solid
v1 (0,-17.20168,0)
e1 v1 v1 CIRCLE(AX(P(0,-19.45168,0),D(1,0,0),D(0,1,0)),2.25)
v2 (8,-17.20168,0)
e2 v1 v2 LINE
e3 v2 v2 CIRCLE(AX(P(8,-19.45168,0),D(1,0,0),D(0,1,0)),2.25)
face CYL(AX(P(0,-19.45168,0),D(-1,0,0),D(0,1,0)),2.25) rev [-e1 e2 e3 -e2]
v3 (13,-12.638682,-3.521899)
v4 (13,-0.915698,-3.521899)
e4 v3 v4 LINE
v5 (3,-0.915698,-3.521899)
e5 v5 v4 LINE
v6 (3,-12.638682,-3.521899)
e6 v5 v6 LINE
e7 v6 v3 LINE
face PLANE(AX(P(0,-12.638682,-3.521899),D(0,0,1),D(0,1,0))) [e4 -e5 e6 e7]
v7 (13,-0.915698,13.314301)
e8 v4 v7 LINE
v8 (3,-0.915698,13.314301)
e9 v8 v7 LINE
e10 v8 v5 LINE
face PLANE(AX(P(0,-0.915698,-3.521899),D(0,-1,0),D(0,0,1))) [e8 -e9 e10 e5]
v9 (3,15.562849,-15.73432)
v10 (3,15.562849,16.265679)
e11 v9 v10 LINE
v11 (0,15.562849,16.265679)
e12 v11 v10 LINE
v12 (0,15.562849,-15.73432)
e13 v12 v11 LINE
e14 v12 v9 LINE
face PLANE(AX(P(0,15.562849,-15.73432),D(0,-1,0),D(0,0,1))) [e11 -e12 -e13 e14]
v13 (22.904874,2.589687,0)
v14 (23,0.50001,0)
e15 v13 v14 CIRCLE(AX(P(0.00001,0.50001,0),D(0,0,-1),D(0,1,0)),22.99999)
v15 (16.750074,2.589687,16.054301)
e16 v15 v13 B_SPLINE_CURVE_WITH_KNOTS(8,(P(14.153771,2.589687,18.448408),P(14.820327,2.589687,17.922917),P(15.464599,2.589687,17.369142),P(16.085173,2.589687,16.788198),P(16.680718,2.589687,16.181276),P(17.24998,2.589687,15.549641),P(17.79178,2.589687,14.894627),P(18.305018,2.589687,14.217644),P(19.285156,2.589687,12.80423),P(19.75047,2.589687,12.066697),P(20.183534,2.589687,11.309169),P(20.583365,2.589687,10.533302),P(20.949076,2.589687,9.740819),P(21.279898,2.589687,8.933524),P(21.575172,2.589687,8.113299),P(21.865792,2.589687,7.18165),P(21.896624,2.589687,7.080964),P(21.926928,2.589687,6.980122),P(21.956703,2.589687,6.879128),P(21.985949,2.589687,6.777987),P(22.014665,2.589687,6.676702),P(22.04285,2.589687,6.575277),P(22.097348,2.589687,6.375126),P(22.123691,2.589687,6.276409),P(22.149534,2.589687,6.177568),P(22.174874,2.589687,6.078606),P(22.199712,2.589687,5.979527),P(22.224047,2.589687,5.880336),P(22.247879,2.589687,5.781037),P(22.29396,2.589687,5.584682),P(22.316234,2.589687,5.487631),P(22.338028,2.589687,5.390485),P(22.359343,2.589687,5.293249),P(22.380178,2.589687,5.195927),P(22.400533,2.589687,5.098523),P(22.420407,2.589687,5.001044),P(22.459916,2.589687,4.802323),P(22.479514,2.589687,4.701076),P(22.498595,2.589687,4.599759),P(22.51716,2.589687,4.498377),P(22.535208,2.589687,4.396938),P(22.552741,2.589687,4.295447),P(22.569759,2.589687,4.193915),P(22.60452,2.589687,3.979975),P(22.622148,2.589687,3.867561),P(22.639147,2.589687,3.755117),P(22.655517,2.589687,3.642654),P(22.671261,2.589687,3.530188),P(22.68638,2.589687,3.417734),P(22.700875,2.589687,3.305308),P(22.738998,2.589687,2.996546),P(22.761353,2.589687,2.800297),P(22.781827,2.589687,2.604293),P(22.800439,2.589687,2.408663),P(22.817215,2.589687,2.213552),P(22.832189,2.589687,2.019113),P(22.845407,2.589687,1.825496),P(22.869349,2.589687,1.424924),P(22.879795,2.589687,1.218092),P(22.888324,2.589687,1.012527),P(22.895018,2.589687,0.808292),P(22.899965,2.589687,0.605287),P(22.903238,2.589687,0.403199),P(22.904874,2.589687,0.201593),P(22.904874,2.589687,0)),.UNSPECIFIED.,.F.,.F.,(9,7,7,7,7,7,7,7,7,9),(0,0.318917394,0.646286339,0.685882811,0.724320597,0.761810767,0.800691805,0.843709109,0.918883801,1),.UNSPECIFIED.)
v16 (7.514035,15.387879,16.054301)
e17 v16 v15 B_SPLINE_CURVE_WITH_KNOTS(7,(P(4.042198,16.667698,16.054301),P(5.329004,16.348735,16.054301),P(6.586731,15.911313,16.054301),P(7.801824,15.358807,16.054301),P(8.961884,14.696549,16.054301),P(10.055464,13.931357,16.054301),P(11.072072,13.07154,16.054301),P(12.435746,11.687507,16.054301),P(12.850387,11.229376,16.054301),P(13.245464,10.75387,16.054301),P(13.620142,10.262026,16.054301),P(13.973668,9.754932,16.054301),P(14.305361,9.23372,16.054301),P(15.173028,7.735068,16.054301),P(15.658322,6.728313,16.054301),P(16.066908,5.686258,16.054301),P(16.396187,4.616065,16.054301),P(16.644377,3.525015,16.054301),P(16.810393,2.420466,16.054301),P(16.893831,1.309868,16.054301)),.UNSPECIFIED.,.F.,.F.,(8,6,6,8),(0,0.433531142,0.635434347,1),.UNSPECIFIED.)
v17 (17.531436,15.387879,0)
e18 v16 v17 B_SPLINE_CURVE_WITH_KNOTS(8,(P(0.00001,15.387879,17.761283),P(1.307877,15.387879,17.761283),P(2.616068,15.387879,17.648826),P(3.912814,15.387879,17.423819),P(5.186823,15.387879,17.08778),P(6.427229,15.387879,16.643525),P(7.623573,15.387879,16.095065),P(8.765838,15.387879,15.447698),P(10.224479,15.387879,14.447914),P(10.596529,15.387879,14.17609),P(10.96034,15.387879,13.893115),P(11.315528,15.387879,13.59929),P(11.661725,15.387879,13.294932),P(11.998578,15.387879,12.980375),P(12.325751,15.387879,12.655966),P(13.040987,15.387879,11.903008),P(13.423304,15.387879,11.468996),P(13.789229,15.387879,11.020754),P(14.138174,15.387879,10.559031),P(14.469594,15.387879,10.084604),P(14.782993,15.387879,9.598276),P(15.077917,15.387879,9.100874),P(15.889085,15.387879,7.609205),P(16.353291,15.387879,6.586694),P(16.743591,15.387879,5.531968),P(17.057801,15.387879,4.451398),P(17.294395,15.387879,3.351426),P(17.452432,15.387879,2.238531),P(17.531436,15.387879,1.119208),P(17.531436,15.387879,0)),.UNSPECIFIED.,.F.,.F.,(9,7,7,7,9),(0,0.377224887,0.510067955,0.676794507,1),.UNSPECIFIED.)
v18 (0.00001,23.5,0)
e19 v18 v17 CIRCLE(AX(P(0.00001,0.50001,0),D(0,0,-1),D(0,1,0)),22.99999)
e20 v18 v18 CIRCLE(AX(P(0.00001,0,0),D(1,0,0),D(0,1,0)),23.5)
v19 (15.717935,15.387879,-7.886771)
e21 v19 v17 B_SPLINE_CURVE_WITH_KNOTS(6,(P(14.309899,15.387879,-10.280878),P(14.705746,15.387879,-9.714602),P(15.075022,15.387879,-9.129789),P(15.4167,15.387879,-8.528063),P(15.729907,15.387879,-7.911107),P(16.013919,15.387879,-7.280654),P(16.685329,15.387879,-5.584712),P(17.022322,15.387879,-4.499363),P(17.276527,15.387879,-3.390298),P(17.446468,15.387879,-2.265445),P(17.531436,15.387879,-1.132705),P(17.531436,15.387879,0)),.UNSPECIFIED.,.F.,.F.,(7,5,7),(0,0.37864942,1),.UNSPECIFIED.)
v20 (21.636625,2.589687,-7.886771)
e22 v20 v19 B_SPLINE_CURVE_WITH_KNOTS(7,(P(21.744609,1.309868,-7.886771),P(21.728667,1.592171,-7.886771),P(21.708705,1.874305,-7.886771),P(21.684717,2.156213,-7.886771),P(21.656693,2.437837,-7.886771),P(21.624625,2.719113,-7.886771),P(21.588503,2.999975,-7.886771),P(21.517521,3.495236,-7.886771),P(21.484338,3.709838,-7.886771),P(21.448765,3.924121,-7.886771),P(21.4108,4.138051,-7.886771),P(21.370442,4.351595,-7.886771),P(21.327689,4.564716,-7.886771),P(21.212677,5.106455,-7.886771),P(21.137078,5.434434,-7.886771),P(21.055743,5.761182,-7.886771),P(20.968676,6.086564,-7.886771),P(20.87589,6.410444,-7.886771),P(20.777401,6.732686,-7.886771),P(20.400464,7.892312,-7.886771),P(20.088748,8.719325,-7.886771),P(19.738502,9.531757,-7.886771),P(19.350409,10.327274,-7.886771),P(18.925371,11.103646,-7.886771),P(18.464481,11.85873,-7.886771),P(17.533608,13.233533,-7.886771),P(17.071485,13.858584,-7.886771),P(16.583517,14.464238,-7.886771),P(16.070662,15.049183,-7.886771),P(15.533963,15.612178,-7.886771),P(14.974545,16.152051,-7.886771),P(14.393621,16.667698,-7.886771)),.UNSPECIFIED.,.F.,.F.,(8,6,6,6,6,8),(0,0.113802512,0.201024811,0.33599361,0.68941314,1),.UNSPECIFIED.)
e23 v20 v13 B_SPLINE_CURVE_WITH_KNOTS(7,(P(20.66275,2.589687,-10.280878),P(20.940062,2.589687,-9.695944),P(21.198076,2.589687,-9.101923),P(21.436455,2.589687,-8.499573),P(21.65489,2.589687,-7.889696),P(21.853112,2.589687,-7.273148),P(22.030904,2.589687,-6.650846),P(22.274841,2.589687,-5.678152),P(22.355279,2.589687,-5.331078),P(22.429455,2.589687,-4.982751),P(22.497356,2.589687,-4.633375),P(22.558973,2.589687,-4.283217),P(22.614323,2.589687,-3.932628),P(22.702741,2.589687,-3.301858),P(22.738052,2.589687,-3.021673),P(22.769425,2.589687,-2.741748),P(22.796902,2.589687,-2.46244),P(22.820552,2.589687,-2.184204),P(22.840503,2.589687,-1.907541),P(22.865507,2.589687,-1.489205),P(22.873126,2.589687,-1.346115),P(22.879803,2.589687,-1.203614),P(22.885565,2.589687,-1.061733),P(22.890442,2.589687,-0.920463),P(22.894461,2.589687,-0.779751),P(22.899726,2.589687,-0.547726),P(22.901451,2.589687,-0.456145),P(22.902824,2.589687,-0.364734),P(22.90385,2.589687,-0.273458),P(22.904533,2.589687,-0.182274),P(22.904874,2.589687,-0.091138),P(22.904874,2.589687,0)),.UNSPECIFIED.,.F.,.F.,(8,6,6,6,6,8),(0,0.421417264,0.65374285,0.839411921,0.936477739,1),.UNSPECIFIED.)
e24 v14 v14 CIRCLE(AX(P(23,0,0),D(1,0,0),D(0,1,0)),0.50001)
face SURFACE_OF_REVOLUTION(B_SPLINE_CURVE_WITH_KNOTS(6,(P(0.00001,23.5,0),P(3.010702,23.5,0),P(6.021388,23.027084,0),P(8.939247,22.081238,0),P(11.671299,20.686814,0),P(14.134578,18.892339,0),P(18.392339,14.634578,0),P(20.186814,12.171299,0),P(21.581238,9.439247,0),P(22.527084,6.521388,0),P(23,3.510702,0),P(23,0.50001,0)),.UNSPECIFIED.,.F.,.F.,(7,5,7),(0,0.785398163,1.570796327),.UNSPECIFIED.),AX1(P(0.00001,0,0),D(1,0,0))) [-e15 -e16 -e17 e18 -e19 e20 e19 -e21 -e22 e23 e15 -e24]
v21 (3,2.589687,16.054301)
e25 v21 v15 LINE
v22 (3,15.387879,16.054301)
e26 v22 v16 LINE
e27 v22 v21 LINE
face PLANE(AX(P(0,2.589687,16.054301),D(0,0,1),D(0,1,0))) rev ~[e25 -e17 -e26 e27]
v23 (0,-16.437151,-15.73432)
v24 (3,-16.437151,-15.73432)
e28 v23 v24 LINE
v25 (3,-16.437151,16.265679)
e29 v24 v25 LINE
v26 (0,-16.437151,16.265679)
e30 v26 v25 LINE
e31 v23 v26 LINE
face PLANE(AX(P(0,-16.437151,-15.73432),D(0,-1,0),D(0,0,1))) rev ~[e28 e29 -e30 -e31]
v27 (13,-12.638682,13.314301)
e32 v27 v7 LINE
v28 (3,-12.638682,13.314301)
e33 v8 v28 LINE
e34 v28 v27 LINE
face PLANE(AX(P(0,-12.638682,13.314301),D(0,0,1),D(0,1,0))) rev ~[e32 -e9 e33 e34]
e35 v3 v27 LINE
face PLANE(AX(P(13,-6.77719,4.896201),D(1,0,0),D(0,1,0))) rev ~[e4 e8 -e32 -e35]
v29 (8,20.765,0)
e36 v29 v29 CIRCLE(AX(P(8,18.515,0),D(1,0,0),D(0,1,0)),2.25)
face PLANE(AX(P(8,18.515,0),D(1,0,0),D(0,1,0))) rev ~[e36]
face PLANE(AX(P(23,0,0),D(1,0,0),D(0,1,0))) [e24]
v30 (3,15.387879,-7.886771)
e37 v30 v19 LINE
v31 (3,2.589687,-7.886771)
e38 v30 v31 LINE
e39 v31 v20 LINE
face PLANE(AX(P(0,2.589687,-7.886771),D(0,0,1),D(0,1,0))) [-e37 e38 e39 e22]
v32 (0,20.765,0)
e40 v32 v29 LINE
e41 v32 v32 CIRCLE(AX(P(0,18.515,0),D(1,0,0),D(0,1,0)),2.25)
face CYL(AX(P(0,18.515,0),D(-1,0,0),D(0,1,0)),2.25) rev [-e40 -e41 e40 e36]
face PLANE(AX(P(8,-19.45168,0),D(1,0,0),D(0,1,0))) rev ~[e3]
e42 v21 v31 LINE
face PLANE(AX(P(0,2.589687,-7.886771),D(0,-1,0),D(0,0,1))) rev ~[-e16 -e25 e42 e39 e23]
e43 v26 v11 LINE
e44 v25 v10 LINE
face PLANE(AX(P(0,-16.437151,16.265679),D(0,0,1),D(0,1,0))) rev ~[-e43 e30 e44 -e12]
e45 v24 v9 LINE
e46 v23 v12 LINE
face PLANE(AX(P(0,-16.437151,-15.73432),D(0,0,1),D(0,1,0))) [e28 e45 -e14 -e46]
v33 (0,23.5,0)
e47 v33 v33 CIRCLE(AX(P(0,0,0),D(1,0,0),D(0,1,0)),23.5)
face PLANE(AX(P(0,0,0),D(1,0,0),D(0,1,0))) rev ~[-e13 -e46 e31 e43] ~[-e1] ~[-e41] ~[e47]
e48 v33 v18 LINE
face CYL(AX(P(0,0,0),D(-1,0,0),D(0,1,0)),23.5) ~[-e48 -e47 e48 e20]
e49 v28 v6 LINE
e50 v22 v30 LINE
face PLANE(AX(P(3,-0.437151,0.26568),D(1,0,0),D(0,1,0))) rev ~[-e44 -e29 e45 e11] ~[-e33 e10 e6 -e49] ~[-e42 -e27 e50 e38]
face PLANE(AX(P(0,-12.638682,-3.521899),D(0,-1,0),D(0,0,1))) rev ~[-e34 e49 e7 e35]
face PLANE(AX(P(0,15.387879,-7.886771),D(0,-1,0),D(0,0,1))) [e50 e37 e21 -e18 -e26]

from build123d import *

# Parameters (mm, degrees)
F1_R      = 23.5
F2_DEPTH  = 23
F3_R      = 22.99999
F0_W      = 32
F0_H      = 31.9999990161
F4_DEPTH  = 3
F5_R      = 2.25
F6_DEPTH  = 8
F7_W      = 12.7981919795
F7_H      = 23.941071704
F8_DEPTH  = 23.001
F9_W      = 11.722983385
F9_H      = 16.8361999094
F10_DEPTH = 13


# Not quite as in the source:
# - a fillet or chamfer is up to 0.001 mm smaller than in the source, because OpenCascade refuses the exact size


with BuildPart() as f2:
    # F1 (on Right) → F2 (new body)
    with BuildSketch(Plane.YZ):
        Circle(F1_R)
    extrude(amount=F2_DEPTH)

    # F3 (radius 23 in the source; OpenCascade refuses exactly that, so slightly less here)
    f3_edges = [f2.edges().sort_by_distance(p)[0] for p in [
        (23, -23.5, 0),
    ]]
    fillet(f3_edges, radius=F3_R)

    # F0 (on Right) → F4 (cut)
    with BuildSketch(Plane.YZ):
        with Locations((-0.437150538, 0.2656796428)):
            Rectangle(F0_W, F0_H)
    extrude(amount=F4_DEPTH, mode=Mode.SUBTRACT)

    # F5 (on Right) → F6 (cut)
    with BuildSketch(Plane.YZ):
        with Locations((18.515, 0)):
            Circle(F5_R)
        with Locations((-19.4516796619, 0)):
            Circle(F5_R)
    extrude(amount=F6_DEPTH, mode=Mode.SUBTRACT)

    # F7 (on face) → F8 (cut, through all)
    with BuildSketch(Plane.YZ):
        with Locations((8.9887827635, 4.0837647393)):
            Rectangle(F7_W, F7_H)
    extrude(amount=F8_DEPTH, mode=Mode.SUBTRACT)

    # F9 (on Right) → F10 (cut)
    with BuildSketch(Plane.YZ):
        with Locations((-6.7771898757, 4.8962011933)):
            Rectangle(F9_W, F9_H)
    extrude(amount=F10_DEPTH, mode=Mode.SUBTRACT)


solid = f2.part
